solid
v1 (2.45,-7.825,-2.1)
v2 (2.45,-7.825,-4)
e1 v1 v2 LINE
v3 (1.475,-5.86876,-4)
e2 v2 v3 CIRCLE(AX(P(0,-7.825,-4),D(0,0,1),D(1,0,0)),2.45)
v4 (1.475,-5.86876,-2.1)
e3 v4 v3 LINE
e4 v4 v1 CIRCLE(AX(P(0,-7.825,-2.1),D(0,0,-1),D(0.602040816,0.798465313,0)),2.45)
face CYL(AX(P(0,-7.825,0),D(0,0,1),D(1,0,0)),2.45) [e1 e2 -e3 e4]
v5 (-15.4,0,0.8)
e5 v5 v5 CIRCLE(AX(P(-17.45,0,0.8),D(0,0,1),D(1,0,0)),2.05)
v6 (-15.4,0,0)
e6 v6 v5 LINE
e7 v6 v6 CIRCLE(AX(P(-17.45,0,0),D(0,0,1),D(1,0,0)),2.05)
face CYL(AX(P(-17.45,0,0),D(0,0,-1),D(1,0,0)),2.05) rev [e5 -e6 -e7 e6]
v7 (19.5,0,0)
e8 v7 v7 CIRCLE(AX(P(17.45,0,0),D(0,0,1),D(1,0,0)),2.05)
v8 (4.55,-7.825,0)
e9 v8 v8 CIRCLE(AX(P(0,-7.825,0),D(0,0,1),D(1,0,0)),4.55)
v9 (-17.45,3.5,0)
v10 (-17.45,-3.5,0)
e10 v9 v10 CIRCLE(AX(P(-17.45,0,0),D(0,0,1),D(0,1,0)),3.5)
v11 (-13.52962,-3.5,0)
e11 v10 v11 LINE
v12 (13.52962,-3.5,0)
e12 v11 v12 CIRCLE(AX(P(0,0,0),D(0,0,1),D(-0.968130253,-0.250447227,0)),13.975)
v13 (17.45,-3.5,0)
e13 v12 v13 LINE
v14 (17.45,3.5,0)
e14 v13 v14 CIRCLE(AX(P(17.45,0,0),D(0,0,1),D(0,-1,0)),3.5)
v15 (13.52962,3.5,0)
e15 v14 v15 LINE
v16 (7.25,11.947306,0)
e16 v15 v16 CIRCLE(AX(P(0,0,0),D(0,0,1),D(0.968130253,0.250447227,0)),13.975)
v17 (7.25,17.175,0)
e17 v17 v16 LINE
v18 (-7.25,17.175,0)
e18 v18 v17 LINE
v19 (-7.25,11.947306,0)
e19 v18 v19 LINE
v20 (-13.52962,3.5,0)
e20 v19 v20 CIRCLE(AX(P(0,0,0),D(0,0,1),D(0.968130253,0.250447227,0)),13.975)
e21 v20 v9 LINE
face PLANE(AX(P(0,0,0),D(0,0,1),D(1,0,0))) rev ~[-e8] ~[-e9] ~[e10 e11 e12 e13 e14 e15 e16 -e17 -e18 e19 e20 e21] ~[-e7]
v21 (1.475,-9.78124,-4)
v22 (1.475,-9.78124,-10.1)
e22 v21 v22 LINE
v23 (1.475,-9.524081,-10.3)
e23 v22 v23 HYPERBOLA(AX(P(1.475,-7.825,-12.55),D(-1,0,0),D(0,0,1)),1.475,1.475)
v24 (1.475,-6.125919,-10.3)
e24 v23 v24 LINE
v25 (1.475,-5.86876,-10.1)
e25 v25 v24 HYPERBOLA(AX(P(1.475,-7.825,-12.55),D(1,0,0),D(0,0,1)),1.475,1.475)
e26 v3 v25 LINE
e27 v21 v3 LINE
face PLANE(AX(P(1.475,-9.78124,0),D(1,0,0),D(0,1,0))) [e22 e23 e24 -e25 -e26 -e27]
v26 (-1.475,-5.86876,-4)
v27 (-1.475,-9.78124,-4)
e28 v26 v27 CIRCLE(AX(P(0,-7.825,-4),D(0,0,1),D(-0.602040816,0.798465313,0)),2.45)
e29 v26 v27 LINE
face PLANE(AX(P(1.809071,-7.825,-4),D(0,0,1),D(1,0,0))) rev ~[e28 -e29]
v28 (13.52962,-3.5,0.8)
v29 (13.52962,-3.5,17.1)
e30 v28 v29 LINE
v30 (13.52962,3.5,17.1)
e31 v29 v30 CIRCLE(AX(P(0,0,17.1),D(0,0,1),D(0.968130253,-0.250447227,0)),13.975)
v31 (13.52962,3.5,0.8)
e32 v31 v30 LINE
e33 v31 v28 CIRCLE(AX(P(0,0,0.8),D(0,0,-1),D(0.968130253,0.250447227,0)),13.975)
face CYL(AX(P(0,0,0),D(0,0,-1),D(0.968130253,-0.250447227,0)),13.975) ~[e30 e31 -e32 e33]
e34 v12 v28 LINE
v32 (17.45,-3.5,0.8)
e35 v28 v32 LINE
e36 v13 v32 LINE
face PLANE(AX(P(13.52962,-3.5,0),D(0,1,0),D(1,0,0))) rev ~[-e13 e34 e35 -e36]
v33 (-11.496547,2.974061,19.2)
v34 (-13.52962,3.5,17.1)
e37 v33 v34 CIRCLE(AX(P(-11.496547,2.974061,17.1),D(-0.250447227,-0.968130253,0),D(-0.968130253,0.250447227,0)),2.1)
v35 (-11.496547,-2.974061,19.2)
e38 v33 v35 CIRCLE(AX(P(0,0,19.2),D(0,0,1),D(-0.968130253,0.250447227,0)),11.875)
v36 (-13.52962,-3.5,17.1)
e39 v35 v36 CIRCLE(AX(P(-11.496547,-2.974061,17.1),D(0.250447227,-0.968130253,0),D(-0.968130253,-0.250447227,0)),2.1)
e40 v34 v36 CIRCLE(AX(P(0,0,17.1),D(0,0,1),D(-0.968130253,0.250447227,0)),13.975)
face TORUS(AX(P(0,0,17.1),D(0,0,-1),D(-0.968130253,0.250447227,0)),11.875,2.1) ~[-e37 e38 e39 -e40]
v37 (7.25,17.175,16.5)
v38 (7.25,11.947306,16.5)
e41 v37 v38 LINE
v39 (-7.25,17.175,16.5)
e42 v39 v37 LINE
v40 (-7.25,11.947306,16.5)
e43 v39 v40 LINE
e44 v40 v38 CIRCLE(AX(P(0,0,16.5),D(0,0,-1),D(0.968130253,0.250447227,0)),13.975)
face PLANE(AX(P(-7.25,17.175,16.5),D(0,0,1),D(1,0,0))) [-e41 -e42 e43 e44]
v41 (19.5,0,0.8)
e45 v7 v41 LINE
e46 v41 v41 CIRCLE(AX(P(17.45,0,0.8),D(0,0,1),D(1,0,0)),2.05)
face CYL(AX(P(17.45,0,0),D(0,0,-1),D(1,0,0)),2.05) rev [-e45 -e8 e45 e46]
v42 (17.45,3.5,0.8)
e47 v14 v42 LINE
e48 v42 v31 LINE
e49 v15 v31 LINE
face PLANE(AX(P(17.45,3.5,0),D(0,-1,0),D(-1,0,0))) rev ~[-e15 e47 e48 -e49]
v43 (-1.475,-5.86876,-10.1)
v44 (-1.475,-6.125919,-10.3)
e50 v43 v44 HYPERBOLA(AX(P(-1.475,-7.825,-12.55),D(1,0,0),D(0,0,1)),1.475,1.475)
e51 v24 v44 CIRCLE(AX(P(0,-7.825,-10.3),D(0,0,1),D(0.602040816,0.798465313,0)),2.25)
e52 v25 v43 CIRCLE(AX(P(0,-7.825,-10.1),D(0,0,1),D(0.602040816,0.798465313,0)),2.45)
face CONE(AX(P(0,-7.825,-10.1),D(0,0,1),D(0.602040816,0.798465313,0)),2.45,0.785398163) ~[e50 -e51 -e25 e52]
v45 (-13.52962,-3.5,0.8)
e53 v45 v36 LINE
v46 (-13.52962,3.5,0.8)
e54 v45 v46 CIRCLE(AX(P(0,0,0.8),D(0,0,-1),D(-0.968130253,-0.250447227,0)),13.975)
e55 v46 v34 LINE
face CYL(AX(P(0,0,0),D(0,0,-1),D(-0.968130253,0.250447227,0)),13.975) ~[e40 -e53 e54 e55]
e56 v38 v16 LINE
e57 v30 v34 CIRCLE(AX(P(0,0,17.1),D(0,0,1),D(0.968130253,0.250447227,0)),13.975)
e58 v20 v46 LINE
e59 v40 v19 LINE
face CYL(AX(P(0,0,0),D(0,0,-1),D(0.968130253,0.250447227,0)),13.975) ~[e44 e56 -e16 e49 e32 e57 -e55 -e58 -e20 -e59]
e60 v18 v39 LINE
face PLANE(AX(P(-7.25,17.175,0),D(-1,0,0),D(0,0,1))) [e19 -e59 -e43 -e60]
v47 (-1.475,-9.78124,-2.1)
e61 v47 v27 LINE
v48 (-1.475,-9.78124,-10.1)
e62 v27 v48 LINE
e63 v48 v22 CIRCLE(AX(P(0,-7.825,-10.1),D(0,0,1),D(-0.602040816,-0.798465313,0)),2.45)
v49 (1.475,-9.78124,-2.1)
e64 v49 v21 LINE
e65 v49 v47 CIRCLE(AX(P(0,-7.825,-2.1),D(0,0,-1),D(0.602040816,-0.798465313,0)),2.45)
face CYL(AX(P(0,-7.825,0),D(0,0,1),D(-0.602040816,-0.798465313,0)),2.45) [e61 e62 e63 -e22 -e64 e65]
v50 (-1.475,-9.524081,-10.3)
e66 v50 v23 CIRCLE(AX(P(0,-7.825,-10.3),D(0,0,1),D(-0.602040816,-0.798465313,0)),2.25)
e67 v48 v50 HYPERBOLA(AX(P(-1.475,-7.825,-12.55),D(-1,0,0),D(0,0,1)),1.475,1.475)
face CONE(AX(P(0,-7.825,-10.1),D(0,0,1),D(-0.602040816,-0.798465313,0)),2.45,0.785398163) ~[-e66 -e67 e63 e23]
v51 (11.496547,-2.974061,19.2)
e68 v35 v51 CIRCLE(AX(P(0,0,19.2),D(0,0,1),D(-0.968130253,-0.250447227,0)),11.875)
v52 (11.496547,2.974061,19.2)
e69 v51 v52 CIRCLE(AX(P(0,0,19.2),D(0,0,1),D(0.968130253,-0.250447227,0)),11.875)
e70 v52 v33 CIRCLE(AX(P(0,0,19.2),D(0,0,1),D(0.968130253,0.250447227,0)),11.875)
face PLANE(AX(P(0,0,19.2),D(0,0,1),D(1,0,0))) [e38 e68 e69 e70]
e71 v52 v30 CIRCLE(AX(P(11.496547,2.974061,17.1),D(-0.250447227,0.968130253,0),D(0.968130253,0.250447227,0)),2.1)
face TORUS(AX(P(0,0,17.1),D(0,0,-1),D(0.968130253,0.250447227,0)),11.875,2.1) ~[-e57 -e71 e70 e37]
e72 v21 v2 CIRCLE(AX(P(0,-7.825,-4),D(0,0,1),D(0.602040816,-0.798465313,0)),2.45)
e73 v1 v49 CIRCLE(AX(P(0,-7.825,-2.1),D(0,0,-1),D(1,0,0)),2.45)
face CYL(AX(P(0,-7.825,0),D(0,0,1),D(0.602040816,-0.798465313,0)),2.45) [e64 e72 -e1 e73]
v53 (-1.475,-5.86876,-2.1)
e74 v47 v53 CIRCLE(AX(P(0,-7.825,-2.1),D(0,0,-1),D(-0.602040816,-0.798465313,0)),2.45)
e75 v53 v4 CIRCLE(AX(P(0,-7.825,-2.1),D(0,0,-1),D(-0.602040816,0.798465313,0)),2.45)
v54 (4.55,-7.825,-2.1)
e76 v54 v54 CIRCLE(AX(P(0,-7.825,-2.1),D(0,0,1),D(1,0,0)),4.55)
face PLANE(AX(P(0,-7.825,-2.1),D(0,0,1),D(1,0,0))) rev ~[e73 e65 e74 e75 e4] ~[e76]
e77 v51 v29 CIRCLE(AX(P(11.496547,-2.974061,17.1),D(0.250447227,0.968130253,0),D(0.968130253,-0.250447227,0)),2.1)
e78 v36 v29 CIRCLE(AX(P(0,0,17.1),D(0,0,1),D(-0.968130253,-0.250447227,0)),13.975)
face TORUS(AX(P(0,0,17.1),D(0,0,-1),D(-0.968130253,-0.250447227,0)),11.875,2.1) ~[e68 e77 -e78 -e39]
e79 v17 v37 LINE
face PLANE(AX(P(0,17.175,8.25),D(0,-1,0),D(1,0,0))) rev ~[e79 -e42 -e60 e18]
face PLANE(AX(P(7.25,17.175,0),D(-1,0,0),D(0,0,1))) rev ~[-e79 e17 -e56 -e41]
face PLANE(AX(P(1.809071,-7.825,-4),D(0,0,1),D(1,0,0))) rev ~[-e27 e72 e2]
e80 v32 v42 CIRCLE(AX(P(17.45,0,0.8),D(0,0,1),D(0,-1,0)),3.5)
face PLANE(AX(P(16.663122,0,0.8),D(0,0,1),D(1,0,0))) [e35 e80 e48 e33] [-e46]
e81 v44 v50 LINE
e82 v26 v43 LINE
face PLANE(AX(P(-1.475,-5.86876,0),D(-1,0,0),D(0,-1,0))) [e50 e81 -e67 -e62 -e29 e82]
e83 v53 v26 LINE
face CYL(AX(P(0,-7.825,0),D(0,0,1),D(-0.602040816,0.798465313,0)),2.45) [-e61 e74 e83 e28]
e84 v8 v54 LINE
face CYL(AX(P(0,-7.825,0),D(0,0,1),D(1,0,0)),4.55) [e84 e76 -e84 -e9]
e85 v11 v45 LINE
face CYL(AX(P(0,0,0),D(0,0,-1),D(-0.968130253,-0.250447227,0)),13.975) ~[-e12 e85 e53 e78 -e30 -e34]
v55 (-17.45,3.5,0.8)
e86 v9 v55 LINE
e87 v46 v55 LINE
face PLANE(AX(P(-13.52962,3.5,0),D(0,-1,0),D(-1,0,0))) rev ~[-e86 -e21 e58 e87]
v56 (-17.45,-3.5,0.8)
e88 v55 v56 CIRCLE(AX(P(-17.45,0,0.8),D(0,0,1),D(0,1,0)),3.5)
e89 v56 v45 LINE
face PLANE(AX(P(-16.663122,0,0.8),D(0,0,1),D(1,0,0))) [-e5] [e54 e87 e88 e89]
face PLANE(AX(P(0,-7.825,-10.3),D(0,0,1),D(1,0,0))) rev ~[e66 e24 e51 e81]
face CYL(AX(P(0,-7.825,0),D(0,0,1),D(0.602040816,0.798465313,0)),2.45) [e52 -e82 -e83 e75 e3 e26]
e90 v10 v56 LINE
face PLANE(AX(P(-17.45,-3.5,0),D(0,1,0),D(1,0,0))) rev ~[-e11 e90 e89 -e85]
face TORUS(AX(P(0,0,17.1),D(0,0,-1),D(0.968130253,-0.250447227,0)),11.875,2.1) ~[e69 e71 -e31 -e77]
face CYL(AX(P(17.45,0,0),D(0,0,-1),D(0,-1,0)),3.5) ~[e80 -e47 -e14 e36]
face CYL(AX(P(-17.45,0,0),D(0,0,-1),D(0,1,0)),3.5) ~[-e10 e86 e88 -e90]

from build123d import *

# Parameters (mm, degrees)
F0_R      = 2.05
F1_DEPTH  = 0.8
F2_DEPTH  = 19.2
F3_R      = 4.55
F4_DEPTH  = 2.1
F5_DEPTH  = 4
F6_DEPTH  = 10.3
F8_W      = 14.5
F8_H      = 16.5
F12_DEPTH = 0.65
F13_R     = 2.1
F14_SIZE  = 0.2


with BuildPart() as f1:
    # F0 (on Top) → F1 (new body)
    with BuildSketch(Plane.XY):
        with BuildLine():
            ThreePointArc((-13.5296202829, -3.5), (-13.975, 0), (-13.5296202829, 3.5))
            Line((-13.5296202829, 3.5), (-17.45, 3.5))
            ThreePointArc((-17.45, 3.5), (-20.95, 0), (-17.45, -3.5))
            Line((-17.45, -3.5), (-13.5296202829, -3.5))
        make_face()
        with Locations((-17.45, 0)):
            Circle(F0_R, mode=Mode.SUBTRACT)
    extrude(amount=F1_DEPTH)



with BuildPart() as f1b:
    # F0 (on Top) → F1, piece 2 (new body)
    with BuildSketch(Plane.XY):
        with BuildLine():
            Line((17.45, 3.5), (13.5296202829, 3.5))
            ThreePointArc((13.5296202829, 3.5), (13.975, 0), (13.5296202829, -3.5))
            Line((13.5296202829, -3.5), (17.45, -3.5))
            ThreePointArc((17.45, -3.5), (20.95, 0), (17.45, 3.5))
        make_face()
        with Locations((17.45, 0)):
            Circle(F0_R, mode=Mode.SUBTRACT)
    extrude(amount=F1_DEPTH)


with BuildPart() as f1_1:
    add(f1.part)

    add(f1b.part)  # F2 merges F1b
    # F0 (on Top) → F2 (join)
    with BuildSketch(Plane.XY):
        with BuildLine():
            ThreePointArc((13.5296202829, -3.5), (13.975, 0), (13.5296202829, 3.5))
            ThreePointArc((13.5296202829, 3.5), (0, 13.975), (-13.5296202829, 3.5))
            ThreePointArc((-13.5296202829, 3.5), (-13.975, 0), (-13.5296202829, -3.5))
            ThreePointArc((-13.5296202829, -3.5), (0, -13.975), (13.5296202829, -3.5))
        make_face()
    extrude(amount=F2_DEPTH)

    # F3 (on Top) → F4 (join)
    with BuildSketch(Plane.XY):
        with Locations((0, -7.825)):
            Circle(F3_R)
        with BuildLine():
            ThreePointArc((1.475, -5.8687599841), (2.1927437151, -6.7321253503), (2.45, -7.825))
            ThreePointArc((2.45, -7.825), (2.1927437151, -8.9178746497), (1.475, -9.7812400159))
            ThreePointArc((1.475, -9.7812400159), (0, -10.275), (-1.475, -9.7812400159))
            ThreePointArc((-1.475, -9.7812400159), (-2.45, -7.825), (-1.475, -5.8687599841))
            ThreePointArc((-1.475, -5.8687599841), (0, -5.375), (1.475, -5.8687599841))
        make_face(mode=Mode.SUBTRACT)
    extrude(amount=-F4_DEPTH)

    # F3 (on Top) → F5 (join)
    with BuildSketch(Plane.XY):
        with BuildLine():
            ThreePointArc((1.475, -9.7812400159), (2.1927437151, -8.9178746497), (2.45, -7.825))
            ThreePointArc((2.45, -7.825), (2.1927437151, -6.7321253503), (1.475, -5.8687599841))
            Line((1.475, -5.8687599841), (1.475, -9.7812400159))
        make_face()
        with BuildLine():
            Line((1.475, -9.7812400159), (1.475, -5.8687599841))
            ThreePointArc((1.475, -5.8687599841), (0, -5.375), (-1.475, -5.8687599841))
            Line((-1.475, -5.8687599841), (-1.475, -9.7812400159))
            ThreePointArc((-1.475, -9.7812400159), (0, -10.275), (1.475, -9.7812400159))
        make_face()
        with BuildLine():
            Line((-1.475, -9.7812400159), (-1.475, -5.8687599841))
            ThreePointArc((-1.475, -5.8687599841), (-2.45, -7.825), (-1.475, -9.7812400159))
        make_face()
    extrude(amount=-F5_DEPTH)

    # F3 (on Top) → F6 (join)
    with BuildSketch(Plane.XY):
        with BuildLine():
            Line((1.475, -9.7812400159), (1.475, -5.8687599841))
            ThreePointArc((1.475, -5.8687599841), (0, -5.375), (-1.475, -5.8687599841))
            Line((-1.475, -5.8687599841), (-1.475, -9.7812400159))
            ThreePointArc((-1.475, -9.7812400159), (0, -10.275), (1.475, -9.7812400159))
        make_face()
    extrude(amount=-F6_DEPTH)

    # F8 (on offset) → F9 (join, up to the next surface of F1)
    with BuildSketch(Plane.XZ.offset(-17.175)):
        with Locations((0, 8.25)):
            Rectangle(F8_W, F8_H)
    extrude(until=Until.NEXT)

    # F11 (on offset) → F12 (cut, through all)
    with BuildSketch(Plane.XY.offset(17.15)):
        with BuildLine():
            Line((-8.625, 12.9959083299), (-8.625, 11.5))
            ThreePointArc((-8.625, 11.5), (-7.9506110955, 11.9761599943), (-7.25, 12.4128209928))
            Line((-7.25, 12.4128209928), (-7.25, 13.8205759578))
            ThreePointArc((-7.25, 13.8205759578), (-7.9482026537, 13.4260870893), (-8.625, 12.9959083299))
        make_face()
        with BuildLine():
            ThreePointArc((7.25, 12.4128209928), (7.9506110955, 11.9761599943), (8.625, 11.5))
            Line((8.625, 11.5), (8.625, 12.9959083299))
            ThreePointArc((8.625, 12.9959083299), (7.9482026537, 13.4260870893), (7.25, 13.8205759578))
            Line((7.25, 13.8205759578), (7.25, 12.4128209928))
        make_face()
    extrude(amount=-F12_DEPTH, mode=Mode.SUBTRACT)

    # F13
    f13_edges = [f1_1.edges().sort_by_distance(p)[0] for p in [
        (-13.52962, -3.5, 19.2),
    ]]
    fillet(f13_edges, radius=F13_R)

    # F14
    f14_edges = [f1_1.edges().sort_by_distance(p)[0] for p in [
        (0, -5.375, -10.3),
        (0, -10.275, -10.3),
    ]]
    chamfer(f14_edges, length=F14_SIZE)


solid = f1_1.part
